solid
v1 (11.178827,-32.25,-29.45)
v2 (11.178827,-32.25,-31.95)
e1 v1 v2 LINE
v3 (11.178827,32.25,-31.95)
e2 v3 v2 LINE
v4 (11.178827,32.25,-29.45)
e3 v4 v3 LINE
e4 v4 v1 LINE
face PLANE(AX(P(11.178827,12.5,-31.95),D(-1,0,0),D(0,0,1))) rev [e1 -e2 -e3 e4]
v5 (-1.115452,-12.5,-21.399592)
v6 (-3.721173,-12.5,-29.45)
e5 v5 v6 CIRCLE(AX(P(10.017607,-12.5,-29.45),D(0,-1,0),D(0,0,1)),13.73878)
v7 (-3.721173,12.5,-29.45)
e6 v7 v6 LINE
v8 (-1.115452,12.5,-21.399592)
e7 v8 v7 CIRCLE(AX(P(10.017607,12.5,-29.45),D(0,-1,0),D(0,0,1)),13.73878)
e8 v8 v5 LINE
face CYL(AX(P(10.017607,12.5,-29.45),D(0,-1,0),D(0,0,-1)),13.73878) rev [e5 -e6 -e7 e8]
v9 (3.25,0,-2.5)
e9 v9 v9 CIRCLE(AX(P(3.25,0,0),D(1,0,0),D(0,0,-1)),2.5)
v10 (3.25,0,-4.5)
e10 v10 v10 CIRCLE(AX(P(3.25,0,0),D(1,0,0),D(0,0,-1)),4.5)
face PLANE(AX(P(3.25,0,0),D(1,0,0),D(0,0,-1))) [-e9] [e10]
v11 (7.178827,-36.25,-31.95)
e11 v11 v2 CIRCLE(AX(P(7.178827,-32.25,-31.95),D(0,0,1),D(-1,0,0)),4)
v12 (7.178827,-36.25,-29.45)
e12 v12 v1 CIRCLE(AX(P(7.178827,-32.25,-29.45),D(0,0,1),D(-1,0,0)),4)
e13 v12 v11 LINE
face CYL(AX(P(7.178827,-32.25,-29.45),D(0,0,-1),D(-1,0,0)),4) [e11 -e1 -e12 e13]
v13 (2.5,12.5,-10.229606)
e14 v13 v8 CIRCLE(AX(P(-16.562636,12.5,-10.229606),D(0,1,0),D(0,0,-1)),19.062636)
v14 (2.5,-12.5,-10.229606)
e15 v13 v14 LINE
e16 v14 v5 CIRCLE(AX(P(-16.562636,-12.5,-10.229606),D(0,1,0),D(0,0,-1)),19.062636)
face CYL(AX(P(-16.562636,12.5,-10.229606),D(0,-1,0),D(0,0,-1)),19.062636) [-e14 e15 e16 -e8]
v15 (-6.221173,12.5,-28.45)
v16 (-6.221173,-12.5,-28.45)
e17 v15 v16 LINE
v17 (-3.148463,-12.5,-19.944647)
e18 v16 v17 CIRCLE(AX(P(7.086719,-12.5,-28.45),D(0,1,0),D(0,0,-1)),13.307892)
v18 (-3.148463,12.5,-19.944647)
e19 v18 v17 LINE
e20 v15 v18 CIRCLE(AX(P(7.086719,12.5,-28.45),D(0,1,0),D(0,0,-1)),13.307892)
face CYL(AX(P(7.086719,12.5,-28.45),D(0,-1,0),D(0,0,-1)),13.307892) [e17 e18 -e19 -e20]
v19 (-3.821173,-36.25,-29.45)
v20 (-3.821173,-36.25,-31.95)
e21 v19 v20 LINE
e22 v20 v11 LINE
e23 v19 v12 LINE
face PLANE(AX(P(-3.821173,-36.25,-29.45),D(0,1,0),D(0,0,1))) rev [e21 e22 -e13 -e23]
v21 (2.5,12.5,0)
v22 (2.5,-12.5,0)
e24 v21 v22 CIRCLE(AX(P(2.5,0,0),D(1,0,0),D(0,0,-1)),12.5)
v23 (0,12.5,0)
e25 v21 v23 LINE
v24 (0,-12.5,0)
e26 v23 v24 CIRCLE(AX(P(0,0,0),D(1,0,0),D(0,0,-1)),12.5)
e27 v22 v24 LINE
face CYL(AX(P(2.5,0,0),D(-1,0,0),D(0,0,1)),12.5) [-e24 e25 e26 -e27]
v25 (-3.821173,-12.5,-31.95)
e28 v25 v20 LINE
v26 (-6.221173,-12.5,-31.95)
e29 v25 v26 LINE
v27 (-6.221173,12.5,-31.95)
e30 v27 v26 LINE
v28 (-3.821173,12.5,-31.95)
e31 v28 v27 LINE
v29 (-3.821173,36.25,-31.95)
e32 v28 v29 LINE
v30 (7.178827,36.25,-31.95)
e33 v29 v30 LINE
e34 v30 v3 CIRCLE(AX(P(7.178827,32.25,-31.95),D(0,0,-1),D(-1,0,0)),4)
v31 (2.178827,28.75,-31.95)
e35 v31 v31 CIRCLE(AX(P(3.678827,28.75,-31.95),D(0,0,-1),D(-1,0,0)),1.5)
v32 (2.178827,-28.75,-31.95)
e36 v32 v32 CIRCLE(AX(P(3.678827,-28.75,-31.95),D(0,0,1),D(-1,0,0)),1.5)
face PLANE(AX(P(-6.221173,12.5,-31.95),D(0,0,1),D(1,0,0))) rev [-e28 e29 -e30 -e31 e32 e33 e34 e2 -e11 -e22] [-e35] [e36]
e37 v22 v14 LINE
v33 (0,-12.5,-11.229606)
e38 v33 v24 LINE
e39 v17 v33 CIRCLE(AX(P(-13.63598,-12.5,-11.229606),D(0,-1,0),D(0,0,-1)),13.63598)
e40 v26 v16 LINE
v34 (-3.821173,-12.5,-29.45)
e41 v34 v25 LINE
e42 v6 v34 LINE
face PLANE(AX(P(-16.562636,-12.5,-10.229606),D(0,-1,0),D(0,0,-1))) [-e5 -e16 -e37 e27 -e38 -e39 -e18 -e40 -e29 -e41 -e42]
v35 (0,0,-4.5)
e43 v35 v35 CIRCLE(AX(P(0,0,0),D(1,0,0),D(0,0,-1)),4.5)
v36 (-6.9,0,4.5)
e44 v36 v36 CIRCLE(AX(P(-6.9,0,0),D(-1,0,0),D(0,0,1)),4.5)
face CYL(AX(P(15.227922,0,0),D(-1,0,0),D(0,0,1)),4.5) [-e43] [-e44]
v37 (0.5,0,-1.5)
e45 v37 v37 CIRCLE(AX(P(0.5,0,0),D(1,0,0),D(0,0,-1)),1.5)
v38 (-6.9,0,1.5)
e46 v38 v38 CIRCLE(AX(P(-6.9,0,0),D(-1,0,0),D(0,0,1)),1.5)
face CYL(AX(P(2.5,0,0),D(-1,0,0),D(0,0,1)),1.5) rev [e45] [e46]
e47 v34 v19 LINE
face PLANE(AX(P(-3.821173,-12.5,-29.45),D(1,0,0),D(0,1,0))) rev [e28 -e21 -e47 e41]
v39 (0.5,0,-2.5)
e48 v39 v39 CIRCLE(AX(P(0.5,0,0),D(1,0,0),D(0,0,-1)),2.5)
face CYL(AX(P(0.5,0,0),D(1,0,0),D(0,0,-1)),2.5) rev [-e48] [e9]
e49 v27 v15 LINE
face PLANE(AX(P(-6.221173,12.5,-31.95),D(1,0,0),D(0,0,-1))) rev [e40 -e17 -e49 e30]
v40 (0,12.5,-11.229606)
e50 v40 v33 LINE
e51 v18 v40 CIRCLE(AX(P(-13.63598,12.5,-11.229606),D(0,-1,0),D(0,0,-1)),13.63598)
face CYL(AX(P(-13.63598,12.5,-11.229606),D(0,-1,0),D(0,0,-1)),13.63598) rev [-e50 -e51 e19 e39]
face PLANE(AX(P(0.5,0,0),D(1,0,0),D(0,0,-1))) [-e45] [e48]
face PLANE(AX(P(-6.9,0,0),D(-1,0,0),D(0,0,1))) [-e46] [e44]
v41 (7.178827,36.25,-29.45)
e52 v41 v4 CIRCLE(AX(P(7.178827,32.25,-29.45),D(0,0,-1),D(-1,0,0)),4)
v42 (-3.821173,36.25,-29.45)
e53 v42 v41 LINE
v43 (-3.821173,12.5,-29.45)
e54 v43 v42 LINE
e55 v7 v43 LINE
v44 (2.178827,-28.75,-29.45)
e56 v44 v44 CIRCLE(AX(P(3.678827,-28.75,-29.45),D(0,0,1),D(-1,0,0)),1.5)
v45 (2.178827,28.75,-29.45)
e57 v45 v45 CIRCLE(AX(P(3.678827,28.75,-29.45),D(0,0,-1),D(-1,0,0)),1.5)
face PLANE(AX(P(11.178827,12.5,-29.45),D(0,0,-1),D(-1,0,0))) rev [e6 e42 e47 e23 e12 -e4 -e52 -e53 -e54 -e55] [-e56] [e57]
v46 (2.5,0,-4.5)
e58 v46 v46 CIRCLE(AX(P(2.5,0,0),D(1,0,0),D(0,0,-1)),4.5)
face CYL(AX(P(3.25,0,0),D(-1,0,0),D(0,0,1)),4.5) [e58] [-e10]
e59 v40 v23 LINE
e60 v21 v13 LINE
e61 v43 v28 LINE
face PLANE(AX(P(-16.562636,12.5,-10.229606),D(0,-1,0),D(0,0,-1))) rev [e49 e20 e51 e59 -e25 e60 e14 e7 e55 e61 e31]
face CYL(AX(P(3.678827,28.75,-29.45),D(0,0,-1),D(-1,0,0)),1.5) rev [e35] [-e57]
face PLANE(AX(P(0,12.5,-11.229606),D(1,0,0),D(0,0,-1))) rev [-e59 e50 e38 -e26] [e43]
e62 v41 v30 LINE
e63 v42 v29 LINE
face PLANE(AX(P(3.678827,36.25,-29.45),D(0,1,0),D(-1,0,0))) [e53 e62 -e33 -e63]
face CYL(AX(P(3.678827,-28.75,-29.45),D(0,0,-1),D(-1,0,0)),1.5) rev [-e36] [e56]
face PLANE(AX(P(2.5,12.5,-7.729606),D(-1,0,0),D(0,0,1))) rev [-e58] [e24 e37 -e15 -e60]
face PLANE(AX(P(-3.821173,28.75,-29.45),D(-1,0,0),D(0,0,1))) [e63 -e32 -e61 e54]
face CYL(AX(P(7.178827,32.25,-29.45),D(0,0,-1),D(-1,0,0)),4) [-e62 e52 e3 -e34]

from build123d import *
from build123d.topology import SkipClean

# Parameters (mm, degrees)
SKETCH1_R                = 1.5
BOSS_EXTRUDE1_DEPTH      = 2.5
BOSS_EXTRUDE2_DEPTH      = 6.9
BOSS_EXTRUDE2_DEPTH_BACK = 2.5
SKETCH2_R                = 4.5
SKETCH2_R_2              = 1.5
SKETCH4_R                = 2.5
CUT_EXTRUDE1_DEPTH       = 2
BOSS_EXTRUDE3_START      = 0.75
SKETCH5_R                = 4.5
SKETCH5_R_2              = 2.5
BOSS_EXTRUDE3_DEPTH      = 0.75
BOSS_EXTRUDE4_DEPTH      = 2.5
CUT_EXTRUDE2_REACH       = 80.314
SKETCH7_W                = 7
SKETCH7_H                = 16.5
SKETCH7_W_2              = 16
SKETCH7_H_2              = 8
CUT_EXTRUDE3_REACH       = 82.041
SKETCH9_W                = 2.5
SKETCH9_H                = 22.388822383
BOSS_EXTRUDE5_DEPTH      = 12.5
FILLET2_R                = 1
FILLET3_R                = 4
CUT_EXTRUDE4_DEPTH       = 74.103052287
CUT_EXTRUDE4_DEPTH_BACK  = 74.103052287
SKETCH10_W               = 78.235731334
SKETCH10_H               = 6.290045588
SKETCH11_W               = 14.9
SKETCH11_H               = 2.5
BOSS_EXTRUDE6_DEPTH      = 12.5
BOSS_EXTRUDE7_DEPTH      = 2.5
SKETCH14_R               = 1.5
CUT_EXTRUDE5_DEPTH       = 2.5


with BuildPart() as part:
    # Sketch1 → Boss-Extrude1 (new body)
    with BuildSketch(Plane(origin=(0, 0, 0), x_dir=(0, 0, -1), z_dir=(1, 0, 0))):
        with BuildLine():
            Line((0, 12.5), (34.45, 12.5))
            Line((34.45, 12.5), (34.45, -12.5))
            Line((34.45, -12.5), (0, -12.5))
            ThreePointArc((0, -12.5), (-12.5, 0), (0, 12.5))
        make_face()
        Circle(SKETCH1_R, mode=Mode.SUBTRACT)
    extrude(amount=BOSS_EXTRUDE1_DEPTH)

    # Sketch2 → Boss-Extrude2 (add, two sides: drawn at the far end of the back side and taken through both)
    with BuildSketch(Plane.ZY.offset(-BOSS_EXTRUDE2_DEPTH_BACK)):
        Circle(SKETCH2_R)
        Circle(SKETCH2_R_2, mode=Mode.SUBTRACT)
    extrude(amount=BOSS_EXTRUDE2_DEPTH + BOSS_EXTRUDE2_DEPTH_BACK)

    # Sketch4 → Cut-Extrude1 (cut)
    with BuildSketch(Plane(origin=(2.5, 0, 0), x_dir=(0, 0, -1), z_dir=(1, 0, 0))):
        Circle(SKETCH4_R)
    extrude(amount=-CUT_EXTRUDE1_DEPTH, mode=Mode.SUBTRACT)

    # Sketch5 → Boss-Extrude3 (add)
    with SkipClean():  # the faces are left unmerged after this step: merging them gives an invalid solid
        with BuildSketch(Plane(origin=(2.5, 0, 0), x_dir=(0, 0, -1), z_dir=(1, 0, 0)).offset(BOSS_EXTRUDE3_START)):
            with Locations(Location((0, 0, 0), (0, 0, 180))):
                Circle(SKETCH5_R)
            Circle(SKETCH5_R_2, mode=Mode.SUBTRACT)
        extrude(amount=-BOSS_EXTRUDE3_DEPTH)

    # Sketch6 → Boss-Extrude4 (add)
    with SkipClean():  # the faces are left unmerged after this step: merging them gives an invalid solid
        with BuildSketch(Plane(origin=(0, 0, -34.45), x_dir=(-1, 0, 0), z_dir=(0, 0, -1))):
            Polygon((-8.812505246, 36.25), (53.321583376, 36.25), (53.321583376, -36.25), (6.25, -36.25), (-19.178416624, -36.25), (-19.178416624, 36.25), align=None)
        extrude(amount=-BOSS_EXTRUDE4_DEPTH)
    add(part.part.scale(1), mode=Mode.REPLACE)  # the faces are merged on a copy

    # Sketch7 → Cut-Extrude2 (cut, up to next)
    with BuildSketch(Plane.XY.offset(-31.95), mode=Mode.PRIVATE) as cut_extrude2_sk1:
        with Locations((-1.711858899, -11.632438111)):
            Rectangle(SKETCH7_W, SKETCH7_H)
    cut_extrude2_tool1 = extrude(cut_extrude2_sk1.sketch, amount=-CUT_EXTRUDE2_REACH, mode=Mode.PRIVATE) & part.part
    # Sketch7 → Cut-Extrude2 (cut, up to next)
    with BuildSketch(Plane.XY.offset(-31.95), mode=Mode.PRIVATE) as cut_extrude2_sk2:
        with Locations((-16.5, 0)):
            Rectangle(SKETCH7_W_2, SKETCH7_H_2)
    cut_extrude2_tool2 = extrude(cut_extrude2_sk2.sketch, amount=-CUT_EXTRUDE2_REACH, mode=Mode.PRIVATE) & part.part
    add(cut_extrude2_tool1.solids().sort_by_distance((-1.711859, -11.632438, -31.95))[0], mode=Mode.SUBTRACT)
    add(cut_extrude2_tool2.solids().sort_by_distance((-16.5, 0, -31.95))[0], mode=Mode.SUBTRACT)

    # Sketch9 → Cut-Extrude3 (cut, up to next)
    with BuildSketch(Plane.XZ.offset(12.5), mode=Mode.PRIVATE) as cut_extrude3_sk1:
        with Locations((1.25, -20.755588809)):
            Rectangle(SKETCH9_W, SKETCH9_H)
    cut_extrude3_tool1 = extrude(cut_extrude3_sk1.sketch, amount=-CUT_EXTRUDE3_REACH, mode=Mode.PRIVATE) & part.part
    add(cut_extrude3_tool1.solids().sort_by_distance((1.25, -12.5, -20.755589))[0], mode=Mode.SUBTRACT)


with BuildPart() as cut_extrude3_piece_1:
    # of the separate pieces the step leaves, piece 1, a body of its own (cut_extrude3_pieces)
    add(part.part.solids().sort_by_distance((-53.321583376, 36.25, -31.95))[0])



with BuildPart() as cut_extrude3_piece_2:
    # of the separate pieces the step leaves, piece 2, a body of its own (cut_extrude3_pieces)
    add(part.part.solids().sort_by_distance((0, 12.5, 0))[0])


with BuildPart() as cut_extrude3_piece_1_1:
    add(cut_extrude3_piece_1.part)

    add(cut_extrude3_piece_2.part)  # Boss-Extrude5 merges Cut-Extrude3 piece 2
    # Sketch8 → Boss-Extrude5 (add, symmetric)
    with BuildSketch(Plane(origin=(0, 0, 0), x_dir=(1, 0, 0), z_dir=(0, 1, 0))):
        with BuildLine():
            Line((0, 7.729605828), (2.5, 7.729605828))
            Line((2.5, 7.729605828), (2.5, 10.229605828))
            ThreePointArc((2.5, 10.229605828), (1.573627862, 16.099871922), (-1.115452176, 21.399592472))
            ThreePointArc((-1.115452176, 21.399592472), (-3.053519862, 25.219195088), (-3.721172696, 29.45))
            Line((-3.721172696, 29.45), (-3.721172696, 31.95))
            Line((-3.721172696, 31.95), (-6.221172696, 31.95))
            Line((-6.221172696, 31.95), (-6.221172696, 28.45))
            ThreePointArc((-6.221172696, 28.45), (-5.429444077, 23.92831405), (-3.148463103, 19.944646916))
            ThreePointArc((-3.148463103, 19.944646916), (-0.81124762, 15.862767844), (0, 11.229605828))
            Line((0, 11.229605828), (0, 7.729605828))
        make_face()
    extrude(amount=BOSS_EXTRUDE5_DEPTH, both=True)

    # Fillet2
    fillet2_edges = [cut_extrude3_piece_1_1.edges().sort_by_distance(p)[0] for p in [
        (-8.5, 4, -33.2),
        (-8.5, -4, -33.2),
        (-24.5, -4, -33.2),
        (-24.5, 4, -33.2),
        (-5.211858899, -19.882438111, -33.2),
        (-5.211858899, -3.382438111, -33.2),
        (1.788141101, -3.382438111, -33.2),
        (1.788141101, -19.882438111, -33.2),
    ]]
    fillet(fillet2_edges, radius=FILLET2_R)

    # Fillet3
    fillet3_edges = [cut_extrude3_piece_1_1.edges().sort_by_distance(p)[0] for p in [
        (19.178416624, 36.25, -33.2),
        (-53.321583376, 36.25, -33.2),
        (-53.321583376, -36.25, -33.2),
        (19.178416624, -36.25, -33.2),
    ]]
    fillet(fillet3_edges, radius=FILLET3_R)

    # Sketch10 → Cut-Extrude4 (cut, two sides: drawn at the far end of the back side and taken through both)
    with SkipClean():  # the faces are left unmerged after this step: merging them gives an invalid solid
        with BuildSketch(Plane(origin=(0, 0, 0), x_dir=(1, 0, 0), z_dir=(0, 1, 0)).offset(-CUT_EXTRUDE4_DEPTH_BACK)):
            with Locations((-17.391929865, 35.095022794)):
                Rectangle(SKETCH10_W, SKETCH10_H)
        extrude(amount=CUT_EXTRUDE4_DEPTH + CUT_EXTRUDE4_DEPTH_BACK, mode=Mode.SUBTRACT)

    # Sketch11 → Boss-Extrude6 (add, symmetric)
    with BuildSketch(Plane(origin=(0, 0, 0), x_dir=(1, 0, 0), z_dir=(0, 1, 0))):
        with Locations((3.728827304, 30.7)):
            Rectangle(SKETCH11_W, SKETCH11_H)
    boss_extrude6 = extrude(amount=BOSS_EXTRUDE6_DEPTH, both=True)

    # Sketch13 → Boss-Extrude7 (add)
    with BuildSketch(Plane(origin=(0, 0, -31.95), x_dir=(-1, 0, 0), z_dir=(0, 0, -1))):
        with BuildLine():
            Line((-11.178827304, 12.5), (3.821172696, 12.5))
            Line((3.821172696, 12.5), (3.821172696, 28.75))
            Line((3.821172696, 28.75), (3.821172696, 36.25))
            Line((3.821172696, 36.25), (-3.678827304, 36.25))
            Line((-3.678827304, 36.25), (-7.178827304, 36.25))
            ThreePointArc((-7.178827304, 36.25), (-10.007254429, 35.078427125), (-11.178827304, 32.25))
            Line((-11.178827304, 32.25), (-11.178827304, 28.75))
            Line((-11.178827304, 28.75), (-11.178827304, 12.5))
        make_face()
    boss_extrude7 = extrude(amount=-BOSS_EXTRUDE7_DEPTH)

    # Mirror1: Boss-Extrude6, Boss-Extrude7 across plane
    add(boss_extrude6.mirror(Plane.ZX))
    add(boss_extrude7.mirror(Plane.ZX))

    # Sketch14 → Cut-Extrude5 (cut)
    with BuildSketch(Plane(origin=(0, 0, -31.95), x_dir=(-1, 0, 0), z_dir=(0, 0, -1))):
        with Locations((-3.678827304, 28.75)):
            Circle(SKETCH14_R)
    cut_extrude5 = extrude(amount=-CUT_EXTRUDE5_DEPTH, mode=Mode.SUBTRACT)

    # Mirror2: Cut-Extrude5 across plane
    add(cut_extrude5.mirror(Plane.ZX), mode=Mode.SUBTRACT)


solid = cut_extrude3_piece_1_1.part
